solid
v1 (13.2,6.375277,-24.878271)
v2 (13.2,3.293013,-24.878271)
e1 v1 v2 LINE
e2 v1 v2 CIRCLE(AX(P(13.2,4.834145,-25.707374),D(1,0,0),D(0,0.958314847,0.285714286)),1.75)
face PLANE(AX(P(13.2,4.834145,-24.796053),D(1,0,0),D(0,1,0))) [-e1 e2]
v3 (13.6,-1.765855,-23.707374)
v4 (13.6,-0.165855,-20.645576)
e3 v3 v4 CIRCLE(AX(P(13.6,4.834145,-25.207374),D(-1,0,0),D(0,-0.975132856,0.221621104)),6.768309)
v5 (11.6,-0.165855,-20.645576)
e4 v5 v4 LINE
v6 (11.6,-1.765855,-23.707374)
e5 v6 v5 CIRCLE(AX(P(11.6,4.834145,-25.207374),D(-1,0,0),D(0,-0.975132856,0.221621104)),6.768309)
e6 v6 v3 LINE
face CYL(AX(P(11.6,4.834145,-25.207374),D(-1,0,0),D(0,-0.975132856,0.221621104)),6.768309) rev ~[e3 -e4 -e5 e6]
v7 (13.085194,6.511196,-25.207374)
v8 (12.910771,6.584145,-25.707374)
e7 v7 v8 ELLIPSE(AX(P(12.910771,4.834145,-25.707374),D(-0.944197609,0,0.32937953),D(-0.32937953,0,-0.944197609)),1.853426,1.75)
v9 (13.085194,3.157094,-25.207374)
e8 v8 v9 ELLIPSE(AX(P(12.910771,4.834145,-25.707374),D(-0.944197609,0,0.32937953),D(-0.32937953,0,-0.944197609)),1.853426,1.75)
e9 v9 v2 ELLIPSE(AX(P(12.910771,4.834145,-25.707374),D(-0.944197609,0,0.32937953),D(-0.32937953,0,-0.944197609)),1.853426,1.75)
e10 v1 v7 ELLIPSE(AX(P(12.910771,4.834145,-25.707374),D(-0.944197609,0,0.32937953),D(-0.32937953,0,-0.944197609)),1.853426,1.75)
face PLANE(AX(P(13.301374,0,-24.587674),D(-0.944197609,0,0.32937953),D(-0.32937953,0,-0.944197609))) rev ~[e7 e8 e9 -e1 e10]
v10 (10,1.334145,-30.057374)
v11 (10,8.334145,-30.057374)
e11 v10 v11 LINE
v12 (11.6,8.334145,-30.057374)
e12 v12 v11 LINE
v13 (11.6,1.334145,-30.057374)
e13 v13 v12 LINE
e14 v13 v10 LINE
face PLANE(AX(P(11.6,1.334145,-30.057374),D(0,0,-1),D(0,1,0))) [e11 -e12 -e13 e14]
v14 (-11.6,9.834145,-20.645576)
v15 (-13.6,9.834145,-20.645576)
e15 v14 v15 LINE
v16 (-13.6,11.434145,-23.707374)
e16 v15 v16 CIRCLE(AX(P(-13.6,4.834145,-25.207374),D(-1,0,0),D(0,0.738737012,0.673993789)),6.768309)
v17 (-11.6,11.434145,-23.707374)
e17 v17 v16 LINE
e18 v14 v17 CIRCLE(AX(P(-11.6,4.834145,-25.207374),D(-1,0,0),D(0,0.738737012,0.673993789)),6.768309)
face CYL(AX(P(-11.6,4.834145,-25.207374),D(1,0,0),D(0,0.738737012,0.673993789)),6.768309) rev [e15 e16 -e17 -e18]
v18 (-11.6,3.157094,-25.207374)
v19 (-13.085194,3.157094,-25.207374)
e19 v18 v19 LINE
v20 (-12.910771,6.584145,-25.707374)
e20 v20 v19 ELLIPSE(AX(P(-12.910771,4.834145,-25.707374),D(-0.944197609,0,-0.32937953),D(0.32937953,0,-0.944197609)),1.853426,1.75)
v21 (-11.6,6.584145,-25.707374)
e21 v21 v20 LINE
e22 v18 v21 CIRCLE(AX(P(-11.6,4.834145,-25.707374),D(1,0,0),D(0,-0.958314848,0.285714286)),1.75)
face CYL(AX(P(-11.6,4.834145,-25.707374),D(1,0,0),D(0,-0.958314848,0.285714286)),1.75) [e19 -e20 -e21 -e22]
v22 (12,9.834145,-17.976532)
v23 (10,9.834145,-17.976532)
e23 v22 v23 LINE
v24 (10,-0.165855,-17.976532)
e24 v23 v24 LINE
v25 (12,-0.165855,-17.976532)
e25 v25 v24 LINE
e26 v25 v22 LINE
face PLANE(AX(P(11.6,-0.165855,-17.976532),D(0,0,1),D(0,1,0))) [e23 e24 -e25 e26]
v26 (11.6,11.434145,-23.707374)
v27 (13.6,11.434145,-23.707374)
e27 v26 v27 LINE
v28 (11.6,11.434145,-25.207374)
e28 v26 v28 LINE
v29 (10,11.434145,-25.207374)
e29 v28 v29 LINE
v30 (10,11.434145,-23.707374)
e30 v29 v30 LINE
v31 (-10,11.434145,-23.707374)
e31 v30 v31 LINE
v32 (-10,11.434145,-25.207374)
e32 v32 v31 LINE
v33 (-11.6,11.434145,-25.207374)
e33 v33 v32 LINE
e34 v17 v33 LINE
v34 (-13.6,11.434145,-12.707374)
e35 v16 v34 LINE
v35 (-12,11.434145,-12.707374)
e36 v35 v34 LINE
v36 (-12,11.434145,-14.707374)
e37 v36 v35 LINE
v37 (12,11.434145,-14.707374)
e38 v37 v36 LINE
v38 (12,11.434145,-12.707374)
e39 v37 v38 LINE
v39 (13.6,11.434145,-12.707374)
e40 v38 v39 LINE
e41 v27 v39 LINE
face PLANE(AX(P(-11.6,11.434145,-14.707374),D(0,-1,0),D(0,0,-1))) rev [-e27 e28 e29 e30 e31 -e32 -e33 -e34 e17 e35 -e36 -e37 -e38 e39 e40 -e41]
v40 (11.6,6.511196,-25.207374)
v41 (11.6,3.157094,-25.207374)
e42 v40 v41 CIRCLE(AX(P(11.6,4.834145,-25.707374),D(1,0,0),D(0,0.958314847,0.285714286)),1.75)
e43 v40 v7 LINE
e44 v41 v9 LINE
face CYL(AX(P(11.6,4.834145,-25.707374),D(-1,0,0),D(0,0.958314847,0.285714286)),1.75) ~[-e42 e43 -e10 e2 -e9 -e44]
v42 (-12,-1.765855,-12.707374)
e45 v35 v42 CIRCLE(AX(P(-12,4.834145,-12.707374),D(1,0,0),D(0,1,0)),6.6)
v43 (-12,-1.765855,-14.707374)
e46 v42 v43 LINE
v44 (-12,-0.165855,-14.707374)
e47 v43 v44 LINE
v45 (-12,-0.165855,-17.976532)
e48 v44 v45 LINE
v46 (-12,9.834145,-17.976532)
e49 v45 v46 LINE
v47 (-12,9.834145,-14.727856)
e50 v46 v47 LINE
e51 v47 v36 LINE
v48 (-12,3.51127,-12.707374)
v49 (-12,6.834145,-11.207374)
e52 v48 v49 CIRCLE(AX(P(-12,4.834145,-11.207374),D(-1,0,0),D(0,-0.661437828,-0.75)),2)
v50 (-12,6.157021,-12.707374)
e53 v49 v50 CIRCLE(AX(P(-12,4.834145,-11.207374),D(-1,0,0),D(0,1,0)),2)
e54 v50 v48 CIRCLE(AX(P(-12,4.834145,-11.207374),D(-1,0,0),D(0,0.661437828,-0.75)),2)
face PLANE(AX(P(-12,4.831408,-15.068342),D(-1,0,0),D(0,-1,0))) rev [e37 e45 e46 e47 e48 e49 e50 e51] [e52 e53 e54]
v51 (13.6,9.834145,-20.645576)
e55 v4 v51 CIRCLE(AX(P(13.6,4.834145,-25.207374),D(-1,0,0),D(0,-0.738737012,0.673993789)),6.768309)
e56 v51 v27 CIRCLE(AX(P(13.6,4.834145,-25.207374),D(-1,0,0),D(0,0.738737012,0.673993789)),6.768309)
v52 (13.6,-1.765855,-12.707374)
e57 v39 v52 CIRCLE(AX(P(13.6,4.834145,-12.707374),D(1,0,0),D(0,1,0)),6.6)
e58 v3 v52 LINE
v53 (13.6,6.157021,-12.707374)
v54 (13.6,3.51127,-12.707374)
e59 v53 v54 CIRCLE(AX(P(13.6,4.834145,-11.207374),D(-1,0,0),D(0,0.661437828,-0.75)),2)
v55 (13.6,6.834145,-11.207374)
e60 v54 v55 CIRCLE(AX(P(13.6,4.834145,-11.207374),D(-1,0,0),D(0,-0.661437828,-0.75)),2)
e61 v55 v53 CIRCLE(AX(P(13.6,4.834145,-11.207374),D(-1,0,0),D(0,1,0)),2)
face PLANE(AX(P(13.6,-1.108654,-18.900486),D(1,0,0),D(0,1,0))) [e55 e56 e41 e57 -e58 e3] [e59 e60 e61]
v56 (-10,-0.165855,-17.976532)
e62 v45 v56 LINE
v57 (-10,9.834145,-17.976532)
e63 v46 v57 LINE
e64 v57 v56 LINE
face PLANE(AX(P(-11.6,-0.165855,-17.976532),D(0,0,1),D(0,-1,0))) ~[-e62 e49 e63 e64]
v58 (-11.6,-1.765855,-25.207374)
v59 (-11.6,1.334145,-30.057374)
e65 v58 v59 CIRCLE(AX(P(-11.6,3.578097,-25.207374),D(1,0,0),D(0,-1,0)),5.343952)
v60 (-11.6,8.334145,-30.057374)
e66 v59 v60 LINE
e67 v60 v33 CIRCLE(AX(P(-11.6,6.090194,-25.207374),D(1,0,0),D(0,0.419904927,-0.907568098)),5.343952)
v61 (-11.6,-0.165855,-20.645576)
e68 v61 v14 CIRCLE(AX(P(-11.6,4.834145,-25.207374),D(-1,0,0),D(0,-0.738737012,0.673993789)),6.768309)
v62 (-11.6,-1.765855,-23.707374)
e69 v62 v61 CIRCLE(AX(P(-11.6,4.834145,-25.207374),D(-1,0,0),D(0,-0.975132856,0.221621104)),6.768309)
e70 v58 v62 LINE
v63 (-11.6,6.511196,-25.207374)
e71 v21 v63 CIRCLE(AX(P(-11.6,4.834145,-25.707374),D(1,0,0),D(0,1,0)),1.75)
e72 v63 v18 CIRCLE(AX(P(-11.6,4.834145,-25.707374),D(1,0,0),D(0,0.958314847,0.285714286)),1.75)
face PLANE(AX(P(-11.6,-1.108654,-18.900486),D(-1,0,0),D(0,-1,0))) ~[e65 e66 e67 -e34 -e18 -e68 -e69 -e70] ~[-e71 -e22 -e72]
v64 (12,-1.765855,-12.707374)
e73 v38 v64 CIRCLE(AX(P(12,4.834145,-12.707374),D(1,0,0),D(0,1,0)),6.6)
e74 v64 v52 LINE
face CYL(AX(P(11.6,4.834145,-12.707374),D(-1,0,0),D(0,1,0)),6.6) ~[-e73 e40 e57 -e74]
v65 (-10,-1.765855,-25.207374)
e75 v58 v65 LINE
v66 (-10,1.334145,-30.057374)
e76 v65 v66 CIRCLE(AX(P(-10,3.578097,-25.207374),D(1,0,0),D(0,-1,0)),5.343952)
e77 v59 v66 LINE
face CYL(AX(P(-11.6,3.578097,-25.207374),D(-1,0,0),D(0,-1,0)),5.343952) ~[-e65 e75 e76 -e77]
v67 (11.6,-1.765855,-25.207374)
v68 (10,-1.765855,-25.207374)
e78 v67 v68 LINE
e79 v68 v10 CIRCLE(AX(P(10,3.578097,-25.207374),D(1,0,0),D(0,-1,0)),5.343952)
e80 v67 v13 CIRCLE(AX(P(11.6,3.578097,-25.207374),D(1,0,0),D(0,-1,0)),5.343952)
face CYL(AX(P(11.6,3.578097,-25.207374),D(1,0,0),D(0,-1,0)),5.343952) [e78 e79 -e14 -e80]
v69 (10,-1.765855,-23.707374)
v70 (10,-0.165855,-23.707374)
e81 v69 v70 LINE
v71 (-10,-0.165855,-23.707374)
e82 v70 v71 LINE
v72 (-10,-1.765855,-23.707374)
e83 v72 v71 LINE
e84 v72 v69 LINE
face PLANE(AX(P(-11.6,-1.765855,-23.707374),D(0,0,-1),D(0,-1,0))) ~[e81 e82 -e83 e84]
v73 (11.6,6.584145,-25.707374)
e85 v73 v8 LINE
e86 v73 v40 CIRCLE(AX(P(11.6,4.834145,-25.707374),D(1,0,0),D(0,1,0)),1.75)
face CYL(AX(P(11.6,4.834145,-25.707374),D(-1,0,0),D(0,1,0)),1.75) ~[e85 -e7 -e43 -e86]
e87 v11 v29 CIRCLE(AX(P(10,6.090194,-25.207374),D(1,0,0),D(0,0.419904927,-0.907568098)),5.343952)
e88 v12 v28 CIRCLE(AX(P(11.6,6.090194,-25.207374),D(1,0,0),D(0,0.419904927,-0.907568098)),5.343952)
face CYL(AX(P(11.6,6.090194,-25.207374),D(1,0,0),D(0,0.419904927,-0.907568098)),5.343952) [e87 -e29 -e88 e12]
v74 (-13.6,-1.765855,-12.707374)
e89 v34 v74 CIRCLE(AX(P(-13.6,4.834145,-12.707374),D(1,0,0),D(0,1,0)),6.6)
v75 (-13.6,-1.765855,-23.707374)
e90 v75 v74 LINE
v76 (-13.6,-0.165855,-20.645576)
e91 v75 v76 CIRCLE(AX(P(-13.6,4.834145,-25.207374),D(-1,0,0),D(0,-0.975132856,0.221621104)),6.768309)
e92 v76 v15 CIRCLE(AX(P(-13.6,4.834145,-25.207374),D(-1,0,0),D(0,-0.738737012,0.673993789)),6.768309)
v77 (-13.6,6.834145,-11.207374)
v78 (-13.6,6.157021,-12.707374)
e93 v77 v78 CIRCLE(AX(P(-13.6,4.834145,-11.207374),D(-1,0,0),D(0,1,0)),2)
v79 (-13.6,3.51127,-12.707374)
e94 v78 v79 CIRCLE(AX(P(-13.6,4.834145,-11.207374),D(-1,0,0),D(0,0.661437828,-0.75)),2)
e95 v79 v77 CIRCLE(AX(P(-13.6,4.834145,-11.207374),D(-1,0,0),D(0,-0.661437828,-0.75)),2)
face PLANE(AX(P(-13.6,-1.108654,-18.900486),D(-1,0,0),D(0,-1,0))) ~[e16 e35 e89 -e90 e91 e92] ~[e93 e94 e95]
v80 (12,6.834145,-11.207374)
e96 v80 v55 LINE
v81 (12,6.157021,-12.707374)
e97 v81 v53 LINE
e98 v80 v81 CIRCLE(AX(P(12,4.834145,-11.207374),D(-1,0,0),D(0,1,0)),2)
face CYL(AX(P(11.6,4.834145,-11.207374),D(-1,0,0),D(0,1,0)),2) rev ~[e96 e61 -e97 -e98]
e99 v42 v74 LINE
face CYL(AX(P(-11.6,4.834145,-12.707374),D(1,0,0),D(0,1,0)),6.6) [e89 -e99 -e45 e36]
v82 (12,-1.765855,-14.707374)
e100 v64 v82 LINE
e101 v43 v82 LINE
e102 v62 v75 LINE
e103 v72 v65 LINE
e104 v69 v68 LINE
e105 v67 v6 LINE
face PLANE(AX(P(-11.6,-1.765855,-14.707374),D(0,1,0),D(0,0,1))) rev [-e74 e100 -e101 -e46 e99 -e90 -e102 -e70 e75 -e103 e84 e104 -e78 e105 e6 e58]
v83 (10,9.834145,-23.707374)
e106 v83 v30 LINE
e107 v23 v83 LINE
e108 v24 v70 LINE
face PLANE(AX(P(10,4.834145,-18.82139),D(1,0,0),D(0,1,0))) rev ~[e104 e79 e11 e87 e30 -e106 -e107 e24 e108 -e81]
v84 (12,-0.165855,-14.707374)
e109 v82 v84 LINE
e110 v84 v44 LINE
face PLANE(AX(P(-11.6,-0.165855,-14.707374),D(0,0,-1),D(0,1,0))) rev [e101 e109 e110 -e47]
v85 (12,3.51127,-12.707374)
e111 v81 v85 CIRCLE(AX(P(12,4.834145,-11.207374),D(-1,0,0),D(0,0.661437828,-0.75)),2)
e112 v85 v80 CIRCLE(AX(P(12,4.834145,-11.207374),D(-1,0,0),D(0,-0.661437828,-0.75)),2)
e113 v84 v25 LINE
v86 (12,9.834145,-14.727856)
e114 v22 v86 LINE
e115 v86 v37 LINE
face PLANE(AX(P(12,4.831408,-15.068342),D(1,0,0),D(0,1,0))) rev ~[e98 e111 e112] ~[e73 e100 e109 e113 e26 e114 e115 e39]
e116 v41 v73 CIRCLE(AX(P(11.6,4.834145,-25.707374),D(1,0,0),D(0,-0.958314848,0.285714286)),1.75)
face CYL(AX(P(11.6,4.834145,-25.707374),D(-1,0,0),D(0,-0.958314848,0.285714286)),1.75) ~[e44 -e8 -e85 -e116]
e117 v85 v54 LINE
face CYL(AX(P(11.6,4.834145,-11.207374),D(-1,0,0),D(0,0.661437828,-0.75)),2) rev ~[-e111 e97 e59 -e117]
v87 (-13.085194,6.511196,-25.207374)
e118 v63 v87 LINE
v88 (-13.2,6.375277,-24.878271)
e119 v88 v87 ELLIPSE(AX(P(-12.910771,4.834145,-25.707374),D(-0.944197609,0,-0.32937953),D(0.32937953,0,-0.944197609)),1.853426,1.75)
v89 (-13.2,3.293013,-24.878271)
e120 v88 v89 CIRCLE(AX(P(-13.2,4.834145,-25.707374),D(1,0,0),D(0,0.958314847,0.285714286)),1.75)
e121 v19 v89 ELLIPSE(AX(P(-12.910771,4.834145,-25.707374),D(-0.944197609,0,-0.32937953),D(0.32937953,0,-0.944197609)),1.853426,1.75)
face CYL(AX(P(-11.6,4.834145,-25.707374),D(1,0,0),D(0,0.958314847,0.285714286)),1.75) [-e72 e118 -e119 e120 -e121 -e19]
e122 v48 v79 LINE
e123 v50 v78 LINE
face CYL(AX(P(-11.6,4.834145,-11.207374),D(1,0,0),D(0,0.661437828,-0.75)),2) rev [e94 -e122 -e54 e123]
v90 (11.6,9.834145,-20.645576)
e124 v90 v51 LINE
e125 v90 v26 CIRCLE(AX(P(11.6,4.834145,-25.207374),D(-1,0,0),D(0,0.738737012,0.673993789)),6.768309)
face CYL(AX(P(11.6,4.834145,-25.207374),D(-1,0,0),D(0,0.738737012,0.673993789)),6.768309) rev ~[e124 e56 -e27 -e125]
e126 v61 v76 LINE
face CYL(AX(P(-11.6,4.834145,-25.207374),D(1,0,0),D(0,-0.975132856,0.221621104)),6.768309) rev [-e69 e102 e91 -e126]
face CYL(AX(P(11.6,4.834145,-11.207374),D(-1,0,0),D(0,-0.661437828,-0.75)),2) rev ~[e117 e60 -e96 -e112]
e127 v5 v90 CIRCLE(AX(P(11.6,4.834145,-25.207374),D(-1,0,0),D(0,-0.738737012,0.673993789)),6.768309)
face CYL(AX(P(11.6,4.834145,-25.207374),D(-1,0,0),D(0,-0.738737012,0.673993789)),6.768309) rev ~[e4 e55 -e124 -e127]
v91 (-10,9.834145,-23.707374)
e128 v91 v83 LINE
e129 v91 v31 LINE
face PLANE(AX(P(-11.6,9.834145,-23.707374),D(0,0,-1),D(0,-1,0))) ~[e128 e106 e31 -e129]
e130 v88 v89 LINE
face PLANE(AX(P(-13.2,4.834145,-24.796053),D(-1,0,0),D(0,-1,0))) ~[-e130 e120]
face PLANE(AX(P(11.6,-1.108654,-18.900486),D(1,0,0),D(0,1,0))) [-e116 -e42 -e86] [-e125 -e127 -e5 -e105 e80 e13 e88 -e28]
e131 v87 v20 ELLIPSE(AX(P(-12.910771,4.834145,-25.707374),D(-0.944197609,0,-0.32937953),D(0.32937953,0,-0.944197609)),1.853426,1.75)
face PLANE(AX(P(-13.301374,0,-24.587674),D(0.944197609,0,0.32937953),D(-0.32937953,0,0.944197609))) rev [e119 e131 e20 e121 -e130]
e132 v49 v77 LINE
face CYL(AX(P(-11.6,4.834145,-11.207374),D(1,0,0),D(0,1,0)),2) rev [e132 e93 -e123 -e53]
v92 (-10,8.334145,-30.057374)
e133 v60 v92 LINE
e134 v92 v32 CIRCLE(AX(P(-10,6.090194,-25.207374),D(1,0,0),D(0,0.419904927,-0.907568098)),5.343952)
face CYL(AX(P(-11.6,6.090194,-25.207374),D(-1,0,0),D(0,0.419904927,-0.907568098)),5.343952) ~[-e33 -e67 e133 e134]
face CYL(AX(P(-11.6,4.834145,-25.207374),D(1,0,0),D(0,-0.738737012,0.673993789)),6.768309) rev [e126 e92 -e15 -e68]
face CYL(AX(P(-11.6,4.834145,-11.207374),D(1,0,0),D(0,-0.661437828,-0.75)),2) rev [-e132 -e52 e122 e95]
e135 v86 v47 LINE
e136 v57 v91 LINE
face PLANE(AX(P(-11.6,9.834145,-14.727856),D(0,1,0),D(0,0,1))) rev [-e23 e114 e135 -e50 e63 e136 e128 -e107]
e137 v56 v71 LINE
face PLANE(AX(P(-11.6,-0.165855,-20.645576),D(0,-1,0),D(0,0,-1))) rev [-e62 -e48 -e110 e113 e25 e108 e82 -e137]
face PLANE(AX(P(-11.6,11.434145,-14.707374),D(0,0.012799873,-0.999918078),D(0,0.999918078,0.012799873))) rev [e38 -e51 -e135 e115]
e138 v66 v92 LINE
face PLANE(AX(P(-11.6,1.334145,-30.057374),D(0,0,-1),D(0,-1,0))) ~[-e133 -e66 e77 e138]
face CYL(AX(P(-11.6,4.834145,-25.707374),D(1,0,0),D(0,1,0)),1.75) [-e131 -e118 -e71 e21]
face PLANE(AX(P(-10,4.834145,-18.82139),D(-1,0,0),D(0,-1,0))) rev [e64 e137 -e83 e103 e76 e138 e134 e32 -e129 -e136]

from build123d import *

# Parameters (mm, degrees)
F2_DEPTH = 1.6
F3_DEPTH = 2
F4_DEPTH = 0.4
F5_DEPTH = 11.6
F6_DEPTH = 2
F7_DEPTH = 1.6
F9_DEPTH = 25


# Not quite as in the source:
# - a feature names something its author has since deleted; it is built from what else it names


with BuildPart() as f2:
    # F1 (on offset) → F2 (new body)
    with BuildSketch(Plane.YZ.offset(11.6)):
        with BuildLine():
            Line((-0.1658547654, -17.9765316878), (-0.1658547654, -20.645576419))
            ThreePointArc((-0.1658547654, -20.645576419), (4.8341452346, -18.4390658066), (9.8341452346, -20.645576419))
            Line((9.8341452346, -20.645576419), (9.8341452346, -17.9765316878))
            Line((9.8341452346, -17.9765316878), (-0.1658547654, -17.9765316878))
        make_face()
        with BuildLine():
            Line((-0.1658547654, -23.7073743102), (-1.7658547654, -23.7073743102))
            Line((-1.7658547654, -23.7073743102), (-1.7658547654, -25.2073743102))
            Line((-1.7658547654, -25.2073743102), (-0.1658547654, -25.2073743102))
            Line((-0.1658547654, -25.2073743102), (3.1570942515, -25.2073743102))
            ThreePointArc((3.1570942515, -25.2073743102), (4.8341452346, -23.9573743102), (6.5111962178, -25.2073743102))
            Line((6.5111962178, -25.2073743102), (9.8341452346, -25.2073743102))
            Line((9.8341452346, -25.2073743102), (11.4341452346, -25.2073743102))
            Line((11.4341452346, -25.2073743102), (11.4341452346, -23.7073743102))
            Line((11.4341452346, -23.7073743102), (9.8341452346, -23.7073743102))
            Line((9.8341452346, -23.7073743102), (9.8341452346, -20.645576419))
            ThreePointArc((9.8341452346, -20.645576419), (4.8341452346, -18.4390658066), (-0.1658547654, -20.645576419))
            Line((-0.1658547654, -20.645576419), (-0.1658547654, -23.7073743102))
        make_face()
        with BuildLine():
            Line((-0.1658547654, -25.2073743102), (-1.7658547654, -25.2073743102))
            ThreePointArc((-1.7658547654, -25.2073743102), (-0.9246460766, -28.0854161792), (1.3341452346, -30.0573743102))
            Line((1.3341452346, -30.0573743102), (8.3341452346, -30.0573743102))
            ThreePointArc((8.3341452346, -30.0573743102), (10.5929365459, -28.0854161792), (11.4341452346, -25.2073743102))
            Line((11.4341452346, -25.2073743102), (9.8341452346, -25.2073743102))
            Line((9.8341452346, -25.2073743102), (6.5111962178, -25.2073743102))
            ThreePointArc((6.5111962178, -25.2073743102), (6.5658119492, -25.4547275414), (6.5841452346, -25.7073743102))
            ThreePointArc((6.5841452346, -25.7073743102), (4.5814984659, -27.4390410247), (3.1570942515, -25.2073743102))
            Line((3.1570942515, -25.2073743102), (-0.1658547654, -25.2073743102))
        make_face()
        with BuildLine():
            Line((6.5111962178, -25.2073743102), (3.1570942515, -25.2073743102))
            ThreePointArc((3.1570942515, -25.2073743102), (4.5814984659, -27.4390410247), (6.5841452346, -25.7073743102))
            ThreePointArc((6.5841452346, -25.7073743102), (6.5658119492, -25.4547275414), (6.5111962178, -25.2073743102))
        make_face()
        with BuildLine():
            ThreePointArc((6.5111962178, -25.2073743102), (4.8341452346, -23.9573743102), (3.1570942515, -25.2073743102))
            Line((3.1570942515, -25.2073743102), (6.5111962178, -25.2073743102))
        make_face()
        with BuildLine():
            Line((9.8341452346, -23.7073743102), (11.4341452346, -23.7073743102))
            ThreePointArc((11.4341452346, -23.7073743102), (10.8327827117, -22.0726736198), (9.8341452346, -20.645576419))
            Line((9.8341452346, -20.645576419), (9.8341452346, -23.7073743102))
        make_face()
        with BuildLine():
            ThreePointArc((-0.1658547654, -20.645576419), (-1.1644922425, -22.0726736198), (-1.7658547654, -23.7073743102))
            Line((-1.7658547654, -23.7073743102), (-0.1658547654, -23.7073743102))
            Line((-0.1658547654, -23.7073743102), (-0.1658547654, -20.645576419))
        make_face()
    extrude(amount=-F2_DEPTH)

    # F1 (on offset) → F3 (join)
    with BuildSketch(Plane.YZ.offset(11.6)):
        with BuildLine():
            Line((-0.1658547654, -12.7073743102), (-1.7658547654, -12.7073743102))
            Line((-1.7658547654, -12.7073743102), (-1.7658547654, -14.7073743102))
            Line((-1.7658547654, -14.7073743102), (-0.1658547654, -14.7073743102))
            Line((-0.1658547654, -14.7073743102), (-0.1658547654, -17.9765316878))
            Line((-0.1658547654, -17.9765316878), (9.8341452346, -17.9765316878))
            Line((9.8341452346, -17.9765316878), (9.8341452346, -14.7278557842))
            Line((9.8341452346, -14.7278557842), (11.4341452346, -14.7073743102))
            Line((11.4341452346, -14.7073743102), (11.4341452346, -12.7073743102))
            Line((11.4341452346, -12.7073743102), (9.8341452346, -12.7073743102))
            Line((9.8341452346, -12.7073743102), (6.1570208902, -12.7073743102))
            ThreePointArc((6.1570208902, -12.7073743102), (4.8341452346, -13.2073743102), (3.5112695791, -12.7073743102))
            Line((3.5112695791, -12.7073743102), (-0.1658547654, -12.7073743102))
        make_face()
        with BuildLine():
            ThreePointArc((11.4341452346, -12.7073743102), (4.8341452346, -6.1073743102), (-1.7658547654, -12.7073743102))
            Line((-1.7658547654, -12.7073743102), (-0.1658547654, -12.7073743102))
            Line((-0.1658547654, -12.7073743102), (3.5112695791, -12.7073743102))
            ThreePointArc((3.5112695791, -12.7073743102), (4.0112695791, -9.3844986547), (6.8341452346, -11.2073743102))
            ThreePointArc((6.8341452346, -11.2073743102), (6.6570208902, -12.0302499657), (6.1570208902, -12.7073743102))
            Line((6.1570208902, -12.7073743102), (9.8341452346, -12.7073743102))
            Line((9.8341452346, -12.7073743102), (11.4341452346, -12.7073743102))
        make_face()
        with BuildLine():
            Line((-0.1658547654, -17.9765316878), (-0.1658547654, -20.645576419))
            ThreePointArc((-0.1658547654, -20.645576419), (4.8341452346, -18.4390658066), (9.8341452346, -20.645576419))
            Line((9.8341452346, -20.645576419), (9.8341452346, -17.9765316878))
            Line((9.8341452346, -17.9765316878), (-0.1658547654, -17.9765316878))
        make_face()
    extrude(amount=F3_DEPTH)

    # F1 (on offset) → F4 (cut)
    with BuildSketch(Plane.YZ.offset(11.6)):
        with BuildLine():
            Line((-0.1658547654, -12.7073743102), (-1.7658547654, -12.7073743102))
            Line((-1.7658547654, -12.7073743102), (-1.7658547654, -14.7073743102))
            Line((-1.7658547654, -14.7073743102), (-0.1658547654, -14.7073743102))
            Line((-0.1658547654, -14.7073743102), (-0.1658547654, -17.9765316878))
            Line((-0.1658547654, -17.9765316878), (9.8341452346, -17.9765316878))
            Line((9.8341452346, -17.9765316878), (9.8341452346, -14.7278557842))
            Line((9.8341452346, -14.7278557842), (11.4341452346, -14.7073743102))
            Line((11.4341452346, -14.7073743102), (11.4341452346, -12.7073743102))
            Line((11.4341452346, -12.7073743102), (9.8341452346, -12.7073743102))
            Line((9.8341452346, -12.7073743102), (6.1570208902, -12.7073743102))
            ThreePointArc((6.1570208902, -12.7073743102), (4.8341452346, -13.2073743102), (3.5112695791, -12.7073743102))
            Line((3.5112695791, -12.7073743102), (-0.1658547654, -12.7073743102))
        make_face()
        with BuildLine():
            ThreePointArc((11.4341452346, -12.7073743102), (4.8341452346, -6.1073743102), (-1.7658547654, -12.7073743102))
            Line((-1.7658547654, -12.7073743102), (-0.1658547654, -12.7073743102))
            Line((-0.1658547654, -12.7073743102), (3.5112695791, -12.7073743102))
            ThreePointArc((3.5112695791, -12.7073743102), (4.0112695791, -9.3844986547), (6.8341452346, -11.2073743102))
            ThreePointArc((6.8341452346, -11.2073743102), (6.6570208902, -12.0302499657), (6.1570208902, -12.7073743102))
            Line((6.1570208902, -12.7073743102), (9.8341452346, -12.7073743102))
            Line((9.8341452346, -12.7073743102), (11.4341452346, -12.7073743102))
        make_face()
    extrude(amount=F4_DEPTH, mode=Mode.SUBTRACT)



with BuildPart() as f5:
    # F1 (on offset) → F5 (new body)
    with BuildSketch(Plane.YZ.offset(11.6)):
        with BuildLine():
            Line((11.4341452346, -23.7073743102), (11.4341452346, -14.7073743102))
            Line((11.4341452346, -14.7073743102), (9.8341452346, -14.7278557842))
            Line((9.8341452346, -14.7278557842), (9.8341452346, -17.9765316878))
            Line((9.8341452346, -17.9765316878), (9.8341452346, -20.645576419))
            ThreePointArc((9.8341452346, -20.645576419), (10.8327827117, -22.0726736198), (11.4341452346, -23.7073743102))
        make_face()
        with BuildLine():
            Line((9.8341452346, -23.7073743102), (11.4341452346, -23.7073743102))
            ThreePointArc((11.4341452346, -23.7073743102), (10.8327827117, -22.0726736198), (9.8341452346, -20.645576419))
            Line((9.8341452346, -20.645576419), (9.8341452346, -23.7073743102))
        make_face()
    extrude(amount=-F5_DEPTH)


with BuildPart() as f5b:
    # F1 (on offset) → F5, piece 2 (new body)
    with BuildSketch(Plane.YZ.offset(11.6)):
        with BuildLine():
            Line((-0.1658547654, -14.7073743102), (-1.7658547654, -14.7073743102))
            Line((-1.7658547654, -14.7073743102), (-1.7658547654, -23.7073743102))
            ThreePointArc((-1.7658547654, -23.7073743102), (-1.1644922425, -22.0726736198), (-0.1658547654, -20.645576419))
            Line((-0.1658547654, -20.645576419), (-0.1658547654, -17.9765316878))
            Line((-0.1658547654, -17.9765316878), (-0.1658547654, -14.7073743102))
        make_face()
        with BuildLine():
            ThreePointArc((-0.1658547654, -20.645576419), (-1.1644922425, -22.0726736198), (-1.7658547654, -23.7073743102))
            Line((-1.7658547654, -23.7073743102), (-0.1658547654, -23.7073743102))
            Line((-0.1658547654, -23.7073743102), (-0.1658547654, -20.645576419))
        make_face()
    extrude(amount=-F5_DEPTH)


with BuildPart() as f2_1:
    add(f2.part)

    add(f5.part)  # F6 merges F5

    add(f5b.part)  # F6 merges F5b
    # F1 (on offset) → F6 (join)
    with BuildSketch(Plane.YZ.offset(11.6)):
        with BuildLine():
            Line((-0.1658547654, -14.7073743102), (-1.7658547654, -14.7073743102))
            Line((-1.7658547654, -14.7073743102), (-1.7658547654, -23.7073743102))
            ThreePointArc((-1.7658547654, -23.7073743102), (-1.1644922425, -22.0726736198), (-0.1658547654, -20.645576419))
            Line((-0.1658547654, -20.645576419), (-0.1658547654, -17.9765316878))
            Line((-0.1658547654, -17.9765316878), (-0.1658547654, -14.7073743102))
        make_face()
        with BuildLine():
            Line((11.4341452346, -23.7073743102), (11.4341452346, -14.7073743102))
            Line((11.4341452346, -14.7073743102), (9.8341452346, -14.7278557842))
            Line((9.8341452346, -14.7278557842), (9.8341452346, -17.9765316878))
            Line((9.8341452346, -17.9765316878), (9.8341452346, -20.645576419))
            ThreePointArc((9.8341452346, -20.645576419), (10.8327827117, -22.0726736198), (11.4341452346, -23.7073743102))
        make_face()
    extrude(amount=F6_DEPTH)

    # F1 (on offset) → F7 (join)
    with BuildSketch(Plane.YZ.offset(11.6)):
        with BuildLine():
            ThreePointArc((6.5111962178, -25.2073743102), (4.8341452346, -23.9573743102), (3.1570942515, -25.2073743102))
            Line((3.1570942515, -25.2073743102), (6.5111962178, -25.2073743102))
        make_face()
        with BuildLine():
            Line((6.5111962178, -25.2073743102), (3.1570942515, -25.2073743102))
            ThreePointArc((3.1570942515, -25.2073743102), (4.5814984659, -27.4390410247), (6.5841452346, -25.7073743102))
            ThreePointArc((6.5841452346, -25.7073743102), (6.5658119492, -25.4547275414), (6.5111962178, -25.2073743102))
        make_face()
    extrude(amount=F7_DEPTH)

    # F8 (on Front) → F9 (cut)
    with BuildSketch(Plane.XZ):
        Polygon((14.5103234728, -25.0094107672), (13.301373871, -24.5876735715), (12.2712288238, -27.5406818837), (13.4801784256, -27.9624190794), align=None)
    extrude(amount=-F9_DEPTH, mode=Mode.SUBTRACT)

    # F10: F2 across plane


with BuildPart() as f2_2:
    add(f2_1.part)
    add(f2_1.part.mirror(Plane.YZ))


with BuildPart() as f11_1:
    # F11: copy of F2
    add(f2_2.part)


solid = f2_2.part
